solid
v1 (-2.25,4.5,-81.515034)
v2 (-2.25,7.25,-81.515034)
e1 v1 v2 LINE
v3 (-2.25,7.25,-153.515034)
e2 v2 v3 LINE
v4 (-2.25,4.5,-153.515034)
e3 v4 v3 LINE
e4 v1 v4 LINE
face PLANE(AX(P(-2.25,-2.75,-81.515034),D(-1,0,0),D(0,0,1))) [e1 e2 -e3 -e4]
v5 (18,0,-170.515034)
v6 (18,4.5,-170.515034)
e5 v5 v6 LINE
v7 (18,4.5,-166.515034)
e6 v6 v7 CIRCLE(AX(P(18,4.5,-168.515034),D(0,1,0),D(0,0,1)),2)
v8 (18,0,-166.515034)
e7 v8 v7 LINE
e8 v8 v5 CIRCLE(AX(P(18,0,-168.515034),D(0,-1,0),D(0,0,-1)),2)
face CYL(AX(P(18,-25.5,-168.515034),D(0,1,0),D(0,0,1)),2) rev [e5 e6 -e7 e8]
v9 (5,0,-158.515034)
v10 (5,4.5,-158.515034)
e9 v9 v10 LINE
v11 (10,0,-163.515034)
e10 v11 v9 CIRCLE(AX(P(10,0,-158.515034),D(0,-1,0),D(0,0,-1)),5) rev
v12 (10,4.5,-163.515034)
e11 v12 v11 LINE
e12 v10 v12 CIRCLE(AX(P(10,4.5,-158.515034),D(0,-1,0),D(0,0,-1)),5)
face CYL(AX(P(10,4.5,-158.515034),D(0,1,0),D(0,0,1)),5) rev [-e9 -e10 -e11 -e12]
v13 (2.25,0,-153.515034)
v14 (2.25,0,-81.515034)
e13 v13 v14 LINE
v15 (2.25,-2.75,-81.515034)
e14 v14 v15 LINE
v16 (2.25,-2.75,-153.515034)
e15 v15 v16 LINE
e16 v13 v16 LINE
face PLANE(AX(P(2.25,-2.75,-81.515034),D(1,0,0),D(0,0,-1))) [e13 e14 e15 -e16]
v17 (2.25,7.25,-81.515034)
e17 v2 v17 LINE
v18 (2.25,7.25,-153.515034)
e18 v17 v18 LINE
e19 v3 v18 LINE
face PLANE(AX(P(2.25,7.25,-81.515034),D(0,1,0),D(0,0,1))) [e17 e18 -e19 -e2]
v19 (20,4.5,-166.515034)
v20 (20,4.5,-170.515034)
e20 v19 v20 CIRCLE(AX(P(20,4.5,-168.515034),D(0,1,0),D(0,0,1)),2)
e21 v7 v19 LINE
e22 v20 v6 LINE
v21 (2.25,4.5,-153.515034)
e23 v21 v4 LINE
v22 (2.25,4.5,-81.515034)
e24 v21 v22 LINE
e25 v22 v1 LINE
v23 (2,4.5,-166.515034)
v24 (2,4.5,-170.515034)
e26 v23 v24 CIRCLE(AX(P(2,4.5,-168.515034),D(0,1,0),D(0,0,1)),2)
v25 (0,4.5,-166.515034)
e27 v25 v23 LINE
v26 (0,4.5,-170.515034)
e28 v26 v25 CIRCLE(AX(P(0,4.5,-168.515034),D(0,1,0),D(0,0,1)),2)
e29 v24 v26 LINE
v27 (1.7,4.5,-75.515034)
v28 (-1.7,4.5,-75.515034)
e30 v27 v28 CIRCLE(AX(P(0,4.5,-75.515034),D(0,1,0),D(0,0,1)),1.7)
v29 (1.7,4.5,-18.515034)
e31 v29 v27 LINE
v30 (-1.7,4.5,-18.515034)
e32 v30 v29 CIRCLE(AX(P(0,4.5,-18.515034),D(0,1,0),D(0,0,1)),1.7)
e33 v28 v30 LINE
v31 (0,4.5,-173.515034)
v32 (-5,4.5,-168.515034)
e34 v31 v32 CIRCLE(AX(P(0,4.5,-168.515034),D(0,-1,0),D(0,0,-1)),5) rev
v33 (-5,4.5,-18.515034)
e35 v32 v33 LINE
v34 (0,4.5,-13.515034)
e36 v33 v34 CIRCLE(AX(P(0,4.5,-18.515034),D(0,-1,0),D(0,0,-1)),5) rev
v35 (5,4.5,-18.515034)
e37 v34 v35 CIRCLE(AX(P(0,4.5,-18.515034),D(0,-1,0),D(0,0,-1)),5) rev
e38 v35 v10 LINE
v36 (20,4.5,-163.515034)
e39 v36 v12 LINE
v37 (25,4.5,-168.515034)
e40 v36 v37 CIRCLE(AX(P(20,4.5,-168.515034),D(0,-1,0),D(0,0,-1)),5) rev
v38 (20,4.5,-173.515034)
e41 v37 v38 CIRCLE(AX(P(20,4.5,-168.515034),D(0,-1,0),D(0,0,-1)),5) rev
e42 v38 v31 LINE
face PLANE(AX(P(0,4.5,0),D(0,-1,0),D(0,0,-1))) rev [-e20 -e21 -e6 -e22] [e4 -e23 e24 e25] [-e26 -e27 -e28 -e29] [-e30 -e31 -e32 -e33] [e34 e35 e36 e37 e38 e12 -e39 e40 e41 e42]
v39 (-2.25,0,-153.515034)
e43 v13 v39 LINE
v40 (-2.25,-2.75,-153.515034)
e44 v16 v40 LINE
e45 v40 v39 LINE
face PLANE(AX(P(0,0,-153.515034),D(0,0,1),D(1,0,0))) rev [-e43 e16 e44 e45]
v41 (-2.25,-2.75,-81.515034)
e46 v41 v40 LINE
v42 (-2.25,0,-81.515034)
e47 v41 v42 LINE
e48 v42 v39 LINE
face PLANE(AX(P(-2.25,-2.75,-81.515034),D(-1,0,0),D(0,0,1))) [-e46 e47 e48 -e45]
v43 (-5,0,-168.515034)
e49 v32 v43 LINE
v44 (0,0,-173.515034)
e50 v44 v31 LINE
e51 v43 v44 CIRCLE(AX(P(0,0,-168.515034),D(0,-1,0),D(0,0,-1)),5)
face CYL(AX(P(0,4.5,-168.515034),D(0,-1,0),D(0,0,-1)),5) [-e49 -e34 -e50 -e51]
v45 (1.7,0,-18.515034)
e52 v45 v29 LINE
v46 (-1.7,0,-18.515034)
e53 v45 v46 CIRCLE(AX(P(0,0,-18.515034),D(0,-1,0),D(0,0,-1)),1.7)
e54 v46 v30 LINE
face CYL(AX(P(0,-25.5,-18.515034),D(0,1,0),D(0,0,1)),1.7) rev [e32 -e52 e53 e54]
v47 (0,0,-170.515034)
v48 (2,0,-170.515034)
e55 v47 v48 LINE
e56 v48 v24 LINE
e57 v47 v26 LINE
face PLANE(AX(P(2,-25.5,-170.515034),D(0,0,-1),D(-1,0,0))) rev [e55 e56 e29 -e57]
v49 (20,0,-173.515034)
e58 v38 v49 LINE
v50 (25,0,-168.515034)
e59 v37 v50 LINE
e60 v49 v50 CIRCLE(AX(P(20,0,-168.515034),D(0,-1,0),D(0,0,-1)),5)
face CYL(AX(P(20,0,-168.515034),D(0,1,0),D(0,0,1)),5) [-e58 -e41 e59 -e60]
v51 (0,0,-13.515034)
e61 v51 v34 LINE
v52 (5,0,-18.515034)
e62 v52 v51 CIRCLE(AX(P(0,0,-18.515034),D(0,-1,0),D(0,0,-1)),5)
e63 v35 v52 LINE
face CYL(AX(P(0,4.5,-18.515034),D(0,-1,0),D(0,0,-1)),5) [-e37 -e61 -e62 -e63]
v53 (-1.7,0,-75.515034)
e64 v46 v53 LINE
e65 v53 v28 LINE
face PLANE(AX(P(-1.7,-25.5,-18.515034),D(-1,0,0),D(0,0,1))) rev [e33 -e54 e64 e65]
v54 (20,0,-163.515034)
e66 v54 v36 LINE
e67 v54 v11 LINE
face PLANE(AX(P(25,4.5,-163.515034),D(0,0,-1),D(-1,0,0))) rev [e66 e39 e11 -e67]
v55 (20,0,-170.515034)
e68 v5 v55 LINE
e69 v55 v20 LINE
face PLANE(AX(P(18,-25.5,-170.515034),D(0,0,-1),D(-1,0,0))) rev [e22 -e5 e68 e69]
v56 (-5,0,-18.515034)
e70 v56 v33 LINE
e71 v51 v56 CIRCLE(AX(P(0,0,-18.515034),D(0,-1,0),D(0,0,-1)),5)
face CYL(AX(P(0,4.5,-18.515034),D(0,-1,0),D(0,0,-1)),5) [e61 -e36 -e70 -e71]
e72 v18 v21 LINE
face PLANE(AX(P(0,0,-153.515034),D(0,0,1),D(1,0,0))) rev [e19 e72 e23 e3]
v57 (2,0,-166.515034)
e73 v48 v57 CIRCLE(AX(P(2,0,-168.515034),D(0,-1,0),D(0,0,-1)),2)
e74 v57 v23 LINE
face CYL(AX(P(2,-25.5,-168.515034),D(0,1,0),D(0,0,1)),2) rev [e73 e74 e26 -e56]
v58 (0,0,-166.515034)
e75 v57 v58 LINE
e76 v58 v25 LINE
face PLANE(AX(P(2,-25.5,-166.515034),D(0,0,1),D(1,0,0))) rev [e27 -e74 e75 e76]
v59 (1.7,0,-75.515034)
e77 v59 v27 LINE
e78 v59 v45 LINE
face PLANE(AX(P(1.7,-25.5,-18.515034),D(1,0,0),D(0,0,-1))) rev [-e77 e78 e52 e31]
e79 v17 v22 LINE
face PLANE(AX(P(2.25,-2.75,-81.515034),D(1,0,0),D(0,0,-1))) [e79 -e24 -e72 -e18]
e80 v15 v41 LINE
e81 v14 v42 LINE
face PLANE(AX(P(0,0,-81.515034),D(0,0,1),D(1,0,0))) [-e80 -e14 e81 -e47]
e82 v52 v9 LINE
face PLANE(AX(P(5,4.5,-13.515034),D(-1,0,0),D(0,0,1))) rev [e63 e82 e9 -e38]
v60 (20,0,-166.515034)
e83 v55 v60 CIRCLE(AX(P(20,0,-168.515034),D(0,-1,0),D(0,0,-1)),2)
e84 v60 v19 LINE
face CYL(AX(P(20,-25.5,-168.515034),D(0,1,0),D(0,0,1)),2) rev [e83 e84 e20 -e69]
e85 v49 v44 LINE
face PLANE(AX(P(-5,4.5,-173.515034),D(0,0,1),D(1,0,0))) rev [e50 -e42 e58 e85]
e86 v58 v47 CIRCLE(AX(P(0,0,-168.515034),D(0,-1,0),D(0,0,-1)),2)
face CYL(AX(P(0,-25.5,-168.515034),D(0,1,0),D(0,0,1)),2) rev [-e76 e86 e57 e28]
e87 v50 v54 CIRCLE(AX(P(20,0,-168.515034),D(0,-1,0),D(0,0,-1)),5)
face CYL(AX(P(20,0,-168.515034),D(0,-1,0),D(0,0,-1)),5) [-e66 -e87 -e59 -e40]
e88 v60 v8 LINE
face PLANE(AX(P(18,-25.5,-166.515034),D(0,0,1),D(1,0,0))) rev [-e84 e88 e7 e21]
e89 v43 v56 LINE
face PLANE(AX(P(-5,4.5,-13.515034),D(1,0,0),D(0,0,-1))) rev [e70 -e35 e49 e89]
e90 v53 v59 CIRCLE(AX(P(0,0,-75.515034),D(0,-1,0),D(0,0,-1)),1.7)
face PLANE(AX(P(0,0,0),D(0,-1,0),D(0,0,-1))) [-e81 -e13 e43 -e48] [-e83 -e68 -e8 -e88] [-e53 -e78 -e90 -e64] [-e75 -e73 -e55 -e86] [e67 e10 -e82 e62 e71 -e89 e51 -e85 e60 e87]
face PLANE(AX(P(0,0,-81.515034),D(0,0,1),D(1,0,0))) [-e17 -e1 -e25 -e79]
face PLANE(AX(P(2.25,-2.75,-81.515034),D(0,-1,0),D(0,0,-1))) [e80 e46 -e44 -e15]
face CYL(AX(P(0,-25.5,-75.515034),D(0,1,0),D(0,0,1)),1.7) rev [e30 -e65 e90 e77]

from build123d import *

# Parameters (mm, degrees)
SKETCH2_W           = 10
SKETCH2_H           = 160
BOSS_EXTRUDE1_DEPTH = 4.5
SKETCH3_W           = 10
SKETCH3_H           = 4.5
BOSS_EXTRUDE2_DEPTH = 20
FILLET1_R           = 5
FILLET2_R           = 5
FILLET3_R           = 5
CUT_EXTRUDE1_DEPTH  = 30
BOSS_EXTRUDE4_START = -20
SKETCH6_W           = 4.5
SKETCH6_H           = 10
BOSS_EXTRUDE4_DEPTH = 72


with BuildPart() as part:
    # Sketch2 → Boss-Extrude1 (new body)
    with BuildSketch(Plane(origin=(0, 0, 0), x_dir=(1, 0, 0), z_dir=(0, 1, 0))):
        with Locations((0, 93.515033533)):
            Rectangle(SKETCH2_W, SKETCH2_H)
    extrude(amount=BOSS_EXTRUDE1_DEPTH)

    # Sketch3 → Boss-Extrude2 (add)
    with BuildSketch(Plane(origin=(5, 0, 0), x_dir=(0, 0, -1), z_dir=(1, 0, 0))):
        with Locations((168.515033533, 2.25)):
            Rectangle(SKETCH3_W, SKETCH3_H)
    extrude(amount=BOSS_EXTRUDE2_DEPTH)

    # Fillet1
    fillet1_edges = [part.edges().sort_by_distance(p)[0] for p in [
        (5, 2.25, -163.515033533),
        (-5, 2.25, -173.515033533),
    ]]
    fillet(fillet1_edges, radius=FILLET1_R)

    # Fillet2
    fillet2_edges = [part.edges().sort_by_distance(p)[0] for p in [
        (-5, 2.25, -13.515033533),
        (5, 2.25, -13.515033533),
    ]]
    fillet(fillet2_edges, radius=FILLET2_R - 0.0001)  # a hair under: the kernel refuses the full size

    # Fillet3
    fillet3_edges = [part.edges().sort_by_distance(p)[0] for p in [
        (25, 2.25, -173.515033533),
        (25, 2.25, -163.515033533),
    ]]
    fillet(fillet3_edges, radius=FILLET3_R - 0.0001)  # a hair under: the kernel refuses the full size

    # Sketch4 → Cut-Extrude1 (cut)
    with BuildSketch(Plane(origin=(0, 4.5, 0), x_dir=(1, 0, 0), z_dir=(0, 1, 0))):
        with BuildLine():
            Line((-1.7, 18.515033533), (-1.7, 75.515033533))
            ThreePointArc((-1.7, 75.515033533), (0, 77.215033533), (1.7, 75.515033533))
            Line((1.7, 75.515033533), (1.7, 18.515033533))
            ThreePointArc((1.7, 18.515033533), (0, 16.815033533), (-1.7, 18.515033533))
        make_face()
        with BuildLine():
            Line((2, 166.515033533), (0, 166.515033533))
            ThreePointArc((0, 166.515033533), (-2, 168.515033533), (0, 170.515033533))
            Line((0, 170.515033533), (2, 170.515033533))
            ThreePointArc((2, 170.515033533), (4, 168.515033533), (2, 166.515033533))
        make_face()
        with BuildLine():
            Line((18, 170.515033533), (20, 170.515033533))
            ThreePointArc((20, 170.515033533), (22, 168.515033533), (20, 166.515033533))
            Line((20, 166.515033533), (18, 166.515033533))
            ThreePointArc((18, 166.515033533), (16, 168.515033533), (18, 170.515033533))
        make_face()
    extrude(amount=-CUT_EXTRUDE1_DEPTH, mode=Mode.SUBTRACT)

    # Sketch6 → Boss-Extrude4 (add)
    with BuildSketch(Plane(origin=(0, 0, -173.515033533), x_dir=(-1, 0, 0), z_dir=(0, 0, -1)).offset(BOSS_EXTRUDE4_START)):
        with Locations((0, 2.25)):
            Rectangle(SKETCH6_W, SKETCH6_H)
    extrude(amount=-BOSS_EXTRUDE4_DEPTH)


solid = part.part
